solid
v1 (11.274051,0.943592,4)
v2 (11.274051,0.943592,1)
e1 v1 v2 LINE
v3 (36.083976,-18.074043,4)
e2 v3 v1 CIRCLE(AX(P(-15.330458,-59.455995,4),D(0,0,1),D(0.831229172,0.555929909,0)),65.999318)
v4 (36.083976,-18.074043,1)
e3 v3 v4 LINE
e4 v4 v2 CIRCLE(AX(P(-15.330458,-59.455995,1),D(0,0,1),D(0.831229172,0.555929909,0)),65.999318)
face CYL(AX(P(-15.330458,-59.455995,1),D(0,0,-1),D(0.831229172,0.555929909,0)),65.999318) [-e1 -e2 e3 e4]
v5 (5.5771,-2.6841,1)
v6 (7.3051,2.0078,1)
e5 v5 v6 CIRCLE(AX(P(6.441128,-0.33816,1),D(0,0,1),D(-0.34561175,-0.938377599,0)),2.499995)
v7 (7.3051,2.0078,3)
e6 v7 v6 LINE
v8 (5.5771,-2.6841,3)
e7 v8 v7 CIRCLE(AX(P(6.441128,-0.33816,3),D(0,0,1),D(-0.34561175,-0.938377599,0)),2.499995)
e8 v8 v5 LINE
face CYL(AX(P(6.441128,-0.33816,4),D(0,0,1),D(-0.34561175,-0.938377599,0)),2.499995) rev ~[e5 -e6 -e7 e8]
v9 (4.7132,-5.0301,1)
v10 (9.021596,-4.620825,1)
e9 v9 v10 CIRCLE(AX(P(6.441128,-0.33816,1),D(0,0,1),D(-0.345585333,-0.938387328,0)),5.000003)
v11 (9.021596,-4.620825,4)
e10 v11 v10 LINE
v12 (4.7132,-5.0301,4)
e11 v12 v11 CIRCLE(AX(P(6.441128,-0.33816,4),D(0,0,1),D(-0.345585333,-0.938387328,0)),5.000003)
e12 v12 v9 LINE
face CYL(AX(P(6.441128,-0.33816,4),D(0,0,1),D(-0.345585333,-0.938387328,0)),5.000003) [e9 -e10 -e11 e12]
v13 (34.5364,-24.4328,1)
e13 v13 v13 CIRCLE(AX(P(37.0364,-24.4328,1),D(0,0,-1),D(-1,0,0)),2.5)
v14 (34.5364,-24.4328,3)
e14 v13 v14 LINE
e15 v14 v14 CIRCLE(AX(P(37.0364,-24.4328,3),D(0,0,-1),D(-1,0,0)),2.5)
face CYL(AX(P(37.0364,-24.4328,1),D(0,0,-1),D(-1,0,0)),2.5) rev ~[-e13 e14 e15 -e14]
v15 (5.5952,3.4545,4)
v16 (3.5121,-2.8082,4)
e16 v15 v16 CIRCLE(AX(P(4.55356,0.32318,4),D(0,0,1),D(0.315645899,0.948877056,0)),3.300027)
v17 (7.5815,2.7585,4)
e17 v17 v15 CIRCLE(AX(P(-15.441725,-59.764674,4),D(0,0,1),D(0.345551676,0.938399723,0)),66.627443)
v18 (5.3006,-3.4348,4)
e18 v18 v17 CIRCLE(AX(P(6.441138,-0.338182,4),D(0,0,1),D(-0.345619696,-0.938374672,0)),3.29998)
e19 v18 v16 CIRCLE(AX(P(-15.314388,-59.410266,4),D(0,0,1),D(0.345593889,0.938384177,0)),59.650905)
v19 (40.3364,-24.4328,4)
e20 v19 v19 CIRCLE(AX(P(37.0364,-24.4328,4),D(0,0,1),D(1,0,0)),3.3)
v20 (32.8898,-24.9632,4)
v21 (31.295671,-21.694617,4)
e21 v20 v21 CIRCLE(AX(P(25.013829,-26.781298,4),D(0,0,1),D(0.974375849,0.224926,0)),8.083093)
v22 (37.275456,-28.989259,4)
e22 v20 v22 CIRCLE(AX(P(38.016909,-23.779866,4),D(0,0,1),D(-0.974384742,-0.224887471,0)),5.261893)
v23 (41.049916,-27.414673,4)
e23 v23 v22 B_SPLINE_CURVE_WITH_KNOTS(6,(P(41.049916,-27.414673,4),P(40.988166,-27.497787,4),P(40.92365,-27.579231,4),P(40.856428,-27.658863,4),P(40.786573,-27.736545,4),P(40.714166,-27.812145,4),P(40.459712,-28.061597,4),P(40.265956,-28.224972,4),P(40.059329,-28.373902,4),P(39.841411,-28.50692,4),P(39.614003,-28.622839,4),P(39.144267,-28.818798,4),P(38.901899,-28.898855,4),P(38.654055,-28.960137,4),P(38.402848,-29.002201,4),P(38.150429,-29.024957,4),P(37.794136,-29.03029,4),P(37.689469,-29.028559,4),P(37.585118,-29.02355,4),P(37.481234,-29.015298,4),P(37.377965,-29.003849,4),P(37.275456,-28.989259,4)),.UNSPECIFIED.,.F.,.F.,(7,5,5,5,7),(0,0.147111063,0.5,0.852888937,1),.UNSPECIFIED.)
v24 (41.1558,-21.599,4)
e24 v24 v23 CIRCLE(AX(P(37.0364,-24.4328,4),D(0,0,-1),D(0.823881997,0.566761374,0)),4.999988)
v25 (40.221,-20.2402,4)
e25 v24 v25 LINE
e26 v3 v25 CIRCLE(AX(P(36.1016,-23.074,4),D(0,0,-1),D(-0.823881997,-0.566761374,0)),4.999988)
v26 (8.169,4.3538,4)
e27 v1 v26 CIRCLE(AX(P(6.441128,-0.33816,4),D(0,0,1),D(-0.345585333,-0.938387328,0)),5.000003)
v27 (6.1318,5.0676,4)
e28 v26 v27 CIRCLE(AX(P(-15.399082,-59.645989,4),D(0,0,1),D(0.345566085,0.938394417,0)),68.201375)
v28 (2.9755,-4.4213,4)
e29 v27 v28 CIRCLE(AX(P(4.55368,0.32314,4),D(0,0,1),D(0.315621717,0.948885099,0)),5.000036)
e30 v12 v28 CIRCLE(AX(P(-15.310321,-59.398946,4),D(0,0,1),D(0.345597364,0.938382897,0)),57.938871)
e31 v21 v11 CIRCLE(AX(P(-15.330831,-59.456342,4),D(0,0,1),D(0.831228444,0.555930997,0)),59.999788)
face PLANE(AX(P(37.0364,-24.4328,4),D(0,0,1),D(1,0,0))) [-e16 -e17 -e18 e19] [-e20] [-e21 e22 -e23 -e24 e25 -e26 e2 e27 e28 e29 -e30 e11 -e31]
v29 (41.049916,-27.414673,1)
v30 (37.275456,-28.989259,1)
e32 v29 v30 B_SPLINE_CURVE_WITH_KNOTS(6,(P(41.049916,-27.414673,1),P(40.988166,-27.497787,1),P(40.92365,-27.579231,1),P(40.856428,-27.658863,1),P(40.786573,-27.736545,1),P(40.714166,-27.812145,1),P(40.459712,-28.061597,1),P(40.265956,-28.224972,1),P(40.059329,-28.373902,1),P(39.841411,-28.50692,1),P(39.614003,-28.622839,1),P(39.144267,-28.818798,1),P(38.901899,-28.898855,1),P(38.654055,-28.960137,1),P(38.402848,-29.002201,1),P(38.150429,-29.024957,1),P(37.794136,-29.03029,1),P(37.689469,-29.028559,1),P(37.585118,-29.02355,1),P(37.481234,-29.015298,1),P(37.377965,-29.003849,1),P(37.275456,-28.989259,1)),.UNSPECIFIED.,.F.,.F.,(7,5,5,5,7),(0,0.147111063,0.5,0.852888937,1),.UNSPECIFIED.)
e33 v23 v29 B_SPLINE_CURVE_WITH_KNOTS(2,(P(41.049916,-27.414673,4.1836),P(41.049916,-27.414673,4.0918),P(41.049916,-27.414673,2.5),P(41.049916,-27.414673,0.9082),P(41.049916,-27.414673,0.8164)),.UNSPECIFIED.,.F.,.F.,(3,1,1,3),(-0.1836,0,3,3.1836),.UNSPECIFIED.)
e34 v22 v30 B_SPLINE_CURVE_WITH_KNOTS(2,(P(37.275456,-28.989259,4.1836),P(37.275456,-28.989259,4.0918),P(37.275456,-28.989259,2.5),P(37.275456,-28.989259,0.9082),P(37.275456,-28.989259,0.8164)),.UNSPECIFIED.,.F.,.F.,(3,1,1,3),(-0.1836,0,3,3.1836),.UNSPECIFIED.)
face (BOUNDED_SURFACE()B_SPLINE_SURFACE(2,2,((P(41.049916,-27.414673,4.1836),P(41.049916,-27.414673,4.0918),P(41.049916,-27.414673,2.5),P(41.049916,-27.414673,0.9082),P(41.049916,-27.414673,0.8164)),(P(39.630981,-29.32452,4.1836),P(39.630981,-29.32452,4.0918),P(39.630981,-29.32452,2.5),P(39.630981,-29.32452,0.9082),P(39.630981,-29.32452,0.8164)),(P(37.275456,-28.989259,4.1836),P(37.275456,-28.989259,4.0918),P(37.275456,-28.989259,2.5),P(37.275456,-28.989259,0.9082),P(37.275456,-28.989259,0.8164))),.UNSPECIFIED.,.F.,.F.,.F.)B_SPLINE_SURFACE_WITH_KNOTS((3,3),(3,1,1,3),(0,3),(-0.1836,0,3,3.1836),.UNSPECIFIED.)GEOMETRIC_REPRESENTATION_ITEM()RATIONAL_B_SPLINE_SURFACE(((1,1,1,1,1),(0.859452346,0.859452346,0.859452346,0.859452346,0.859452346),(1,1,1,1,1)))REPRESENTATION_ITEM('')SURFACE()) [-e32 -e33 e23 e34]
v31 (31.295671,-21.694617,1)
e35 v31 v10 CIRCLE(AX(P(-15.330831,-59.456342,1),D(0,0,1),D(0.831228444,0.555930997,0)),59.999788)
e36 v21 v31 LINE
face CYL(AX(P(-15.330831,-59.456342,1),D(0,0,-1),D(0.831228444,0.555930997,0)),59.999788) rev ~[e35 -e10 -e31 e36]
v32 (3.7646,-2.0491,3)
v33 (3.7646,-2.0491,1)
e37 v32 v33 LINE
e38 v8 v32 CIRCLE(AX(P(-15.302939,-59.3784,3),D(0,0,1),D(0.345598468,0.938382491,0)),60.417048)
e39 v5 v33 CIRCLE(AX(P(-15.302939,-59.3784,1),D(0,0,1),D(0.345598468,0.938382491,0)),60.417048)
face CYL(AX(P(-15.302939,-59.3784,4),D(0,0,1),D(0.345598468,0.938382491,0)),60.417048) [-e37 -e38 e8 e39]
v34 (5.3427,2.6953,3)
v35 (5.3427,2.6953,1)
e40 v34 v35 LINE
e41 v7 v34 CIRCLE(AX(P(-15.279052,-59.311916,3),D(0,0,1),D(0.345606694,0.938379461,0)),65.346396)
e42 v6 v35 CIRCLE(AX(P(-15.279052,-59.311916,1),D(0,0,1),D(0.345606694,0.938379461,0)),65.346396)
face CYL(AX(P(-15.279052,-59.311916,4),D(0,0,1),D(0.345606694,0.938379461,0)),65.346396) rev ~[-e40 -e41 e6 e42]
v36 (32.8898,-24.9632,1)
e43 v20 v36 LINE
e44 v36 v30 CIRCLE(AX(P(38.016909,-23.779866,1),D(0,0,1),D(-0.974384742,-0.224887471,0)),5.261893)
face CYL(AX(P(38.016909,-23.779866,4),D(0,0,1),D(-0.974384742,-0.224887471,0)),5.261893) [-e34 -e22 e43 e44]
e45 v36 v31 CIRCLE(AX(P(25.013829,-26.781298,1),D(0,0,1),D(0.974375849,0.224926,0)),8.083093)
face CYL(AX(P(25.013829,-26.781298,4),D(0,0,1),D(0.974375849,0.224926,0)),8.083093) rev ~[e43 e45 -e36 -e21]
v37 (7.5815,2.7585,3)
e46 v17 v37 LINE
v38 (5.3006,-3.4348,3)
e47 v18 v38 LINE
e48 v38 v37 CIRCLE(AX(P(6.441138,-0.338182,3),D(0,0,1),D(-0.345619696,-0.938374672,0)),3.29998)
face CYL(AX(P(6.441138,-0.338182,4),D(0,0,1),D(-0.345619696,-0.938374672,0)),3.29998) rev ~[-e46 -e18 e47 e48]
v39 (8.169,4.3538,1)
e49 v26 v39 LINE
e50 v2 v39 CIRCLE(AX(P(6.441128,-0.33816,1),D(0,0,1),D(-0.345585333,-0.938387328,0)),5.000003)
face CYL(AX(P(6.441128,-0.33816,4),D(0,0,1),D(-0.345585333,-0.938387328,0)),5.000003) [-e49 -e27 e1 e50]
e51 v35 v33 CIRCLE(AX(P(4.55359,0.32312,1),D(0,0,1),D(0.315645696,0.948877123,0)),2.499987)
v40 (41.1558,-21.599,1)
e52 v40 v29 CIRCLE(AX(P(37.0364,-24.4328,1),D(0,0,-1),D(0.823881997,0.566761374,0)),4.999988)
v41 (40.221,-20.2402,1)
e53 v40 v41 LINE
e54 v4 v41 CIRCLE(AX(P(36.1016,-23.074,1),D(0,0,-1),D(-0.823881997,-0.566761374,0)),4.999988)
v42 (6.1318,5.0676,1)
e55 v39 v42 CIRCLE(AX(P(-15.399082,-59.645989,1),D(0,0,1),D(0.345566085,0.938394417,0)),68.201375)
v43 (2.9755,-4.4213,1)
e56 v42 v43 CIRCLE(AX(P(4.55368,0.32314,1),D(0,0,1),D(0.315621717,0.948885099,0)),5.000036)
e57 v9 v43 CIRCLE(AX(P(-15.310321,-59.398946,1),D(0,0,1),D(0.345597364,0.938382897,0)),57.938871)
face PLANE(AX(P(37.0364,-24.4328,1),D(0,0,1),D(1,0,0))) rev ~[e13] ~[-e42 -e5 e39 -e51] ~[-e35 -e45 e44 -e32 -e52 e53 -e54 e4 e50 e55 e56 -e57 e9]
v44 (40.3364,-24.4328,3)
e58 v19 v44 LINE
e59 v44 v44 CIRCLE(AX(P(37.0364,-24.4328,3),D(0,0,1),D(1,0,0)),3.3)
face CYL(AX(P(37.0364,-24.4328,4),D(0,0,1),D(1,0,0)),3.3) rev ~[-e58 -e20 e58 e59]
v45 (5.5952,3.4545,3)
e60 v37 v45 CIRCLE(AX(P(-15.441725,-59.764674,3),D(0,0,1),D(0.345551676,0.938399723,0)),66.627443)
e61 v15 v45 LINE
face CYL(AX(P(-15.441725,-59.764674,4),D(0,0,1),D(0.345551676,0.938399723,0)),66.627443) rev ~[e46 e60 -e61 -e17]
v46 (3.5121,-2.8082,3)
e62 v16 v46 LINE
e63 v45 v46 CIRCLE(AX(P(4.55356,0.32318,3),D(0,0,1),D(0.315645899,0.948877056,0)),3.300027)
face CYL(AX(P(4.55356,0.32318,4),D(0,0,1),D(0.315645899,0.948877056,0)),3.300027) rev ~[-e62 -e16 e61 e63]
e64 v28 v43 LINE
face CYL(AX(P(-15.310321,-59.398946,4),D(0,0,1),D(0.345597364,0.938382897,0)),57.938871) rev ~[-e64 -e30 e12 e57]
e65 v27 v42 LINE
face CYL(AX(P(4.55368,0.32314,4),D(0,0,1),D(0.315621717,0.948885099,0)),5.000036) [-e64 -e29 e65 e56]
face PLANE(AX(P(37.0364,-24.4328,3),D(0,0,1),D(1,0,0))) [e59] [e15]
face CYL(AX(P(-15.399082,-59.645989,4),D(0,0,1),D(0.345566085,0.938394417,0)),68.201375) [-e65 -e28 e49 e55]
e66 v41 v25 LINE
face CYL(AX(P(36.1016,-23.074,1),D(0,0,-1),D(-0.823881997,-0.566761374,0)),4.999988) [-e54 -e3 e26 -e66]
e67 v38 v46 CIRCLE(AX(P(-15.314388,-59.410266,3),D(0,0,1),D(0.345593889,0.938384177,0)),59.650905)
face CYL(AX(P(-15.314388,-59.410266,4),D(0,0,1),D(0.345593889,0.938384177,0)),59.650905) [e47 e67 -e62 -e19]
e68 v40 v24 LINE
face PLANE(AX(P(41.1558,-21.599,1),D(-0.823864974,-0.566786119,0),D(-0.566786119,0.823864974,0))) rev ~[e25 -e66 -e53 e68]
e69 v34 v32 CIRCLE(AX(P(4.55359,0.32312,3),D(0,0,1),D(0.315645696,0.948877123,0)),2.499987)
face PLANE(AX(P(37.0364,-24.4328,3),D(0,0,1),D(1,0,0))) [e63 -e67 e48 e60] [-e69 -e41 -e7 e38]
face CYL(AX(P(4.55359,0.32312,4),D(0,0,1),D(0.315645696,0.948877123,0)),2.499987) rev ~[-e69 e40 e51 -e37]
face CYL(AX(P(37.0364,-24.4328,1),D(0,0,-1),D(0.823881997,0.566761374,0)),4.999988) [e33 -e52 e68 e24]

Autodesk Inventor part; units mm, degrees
ref_plane "YZ Plane" through (0, 0, 0) normal (1, 0, 0) x (0, 1, 0)
ref_plane "XZ Plane" through (0, 0, 0) normal (0, 1, 0) x (-1, 0, 0)
ref_plane "Work Plane1" through (37.0364, -24.4328, 1) normal (0, 0, 1) x (1, 0, 0)
sketch "Sketch2" plane through (37.0364, -24.4328, 1) normal (0, 0, 1) x (1, 0, 0)
  circle A0 centre (0, 0) radius 3 construction
  circle A1 centre (0, 0) radius 1.25 projected
  circle A2 centre (-31.5364, 24.4328) radius 3 construction
  circle A3 centre (-31.5364, 24.4328) radius 1.4795 projected
  circle A4 centre (0, 0) radius 1.25 projected
  circle A5 centre (-31.5364, 24.4328) radius 1.4795 projected
  arc A6 (0, 0) -> (-31.5364, 24.4328) centre (-52.3674, -35.0237) ccw construction
  arc A7 (2.4937, 1.6678) -> (-30.5445, 27.264) centre (-52.3674, -35.0237) ccw
  arc A8 (-2.4937, -1.6678) -> (-32.5284, 21.6015) centre (-52.3674, -35.0237) ccw
  arc A9 (-2.4937, -1.6678) -> (2.4937, 1.6678) centre (0, 0) ccw
  arc A10 (-30.5445, 27.264) -> (-32.5284, 21.6015) centre (-31.5364, 24.4328) ccw
  point P0 (-37.0364, 24.4328)
  dimension "d3" = 60
extrude "Extrusion2" add sketch "Sketch2" along normal blind 3
sketch "Sketch4" plane through (5.5, 0, 4) normal (0, 0, 1) x (1, 0, 0)
  arc A0 (29.0427, -26.1006) -> (-0.992, -2.8313) centre (-20.831, -59.4565) ccw construction
  arc A1 (34.0301, -22.765) -> (0.992, 2.8313) centre (-20.831, -59.4565) ccw construction
  circle A2 centre (0, 0) radius 3 construction
  circle A3 centre (0, 0) radius 1.4795 construction
  arc A4 (0.9411, -0.3381) -> (-0.9463, 0.3231) centre (-20.831, -59.4565) ccw construction
  arc A5 (2.669, 4.3538) -> (0.6318, 5.0676) centre (-20.831, -59.4565) ccw
  arc A6 (-0.7868, -5.0301) -> (-2.5245, -4.4213) centre (-20.831, -59.4565) ccw
  arc A7 (-0.7868, -5.0301) -> (2.669, 4.3538) centre (0.9411, -0.3381) ccw
  arc A8 (0.6318, 5.0676) -> (-2.5245, -4.4213) centre (-0.9463, 0.3231) ccw
  arc A9 (0.992, 2.8313) -> (-0.992, -2.8313) centre (0, 0) ccw projected
  arc A10 (29.0427, -26.1006) -> (34.0301, -22.765) centre (31.5364, -24.4328) ccw projected
  dimension "d15" = 10
  dimension "d30" = 1
  dimension "d31" = 1
extrude "Extrusion4" add sketch "Sketch4" against normal blind 3
sketch "Sketch5" plane through (37.0364, -24.4328, 4) normal (0, 0, 1) x (1, 0, 0)
  arc A0 (-30.5953, 24.0947) -> (-32.4828, 24.7559) centre (-52.3674, -35.0237) ccw construction
  arc A1 (-29.7313, 26.4406) -> (-31.6937, 27.1281) centre (-52.3674, -35.0237) ccw
  arc A2 (-31.4593, 21.7487) -> (-33.2718, 22.3837) centre (-52.3674, -35.0237) ccw
  arc A3 (-31.4593, 21.7487) -> (-29.7313, 26.4406) centre (-30.5953, 24.0947) ccw
  arc A4 (-31.6937, 27.1281) -> (-33.2718, 22.3837) centre (-32.4828, 24.7559) ccw
  arc A5 (-30.9046, 29.5004) -> (-34.0609, 20.0115) centre (-32.4828, 24.7559) ccw projected
  arc A6 (-32.3233, 19.4027) -> (-34.0609, 20.0115) centre (-52.3674, -35.0237) ccw projected
  arc A7 (-28.8674, 28.7866) -> (-30.9046, 29.5004) centre (-52.3674, -35.0237) ccw projected
  arc A8 (-25.7624, 25.3765) -> (-28.8674, 28.7866) centre (-30.5953, 24.0947) ccw projected
  arc A9 (-32.3233, 19.4027) -> (-28.0148, 19.812) centre (-30.5953, 24.0947) ccw projected
  arc A10 (-29.4549, 27.1913) -> (-31.4412, 27.8873) centre (-52.3674, -35.0237) ccw
  arc A11 (-31.4412, 27.8873) -> (-33.5243, 21.6246) centre (-32.4828, 24.7559) ccw
  arc A12 (-31.7358, 20.998) -> (-33.5243, 21.6246) centre (-52.3674, -35.0237) ccw
  arc A13 (-31.7358, 20.998) -> (-29.4549, 27.1913) centre (-30.5953, 24.0947) ccw
  dimension "d18" = 5
  dimension "d35" = 0.8
extrude "Extrusion5" cut sketch "Sketch5" against normal blind 5 contours A3 A2 A4 A1
sketch "Sketch6" plane through (37.0364, -24.4328, 1) normal (0, 0, -1) x (-1, 0, 0)
  circle A0 centre (0, 0) radius 1.25 projected
  circle A1 centre (0, 0) radius 2.5
  arc A2 (-4.1194, 2.8338) -> (4.1194, -2.8338) centre (0, 0) ccw
  arc A3 (31.5364, 24.4328) -> (0, 0) centre (52.3674, -35.0237) ccw construction
  arc A4 (5.0542, -1.475) -> (-3.1846, 4.1926) centre (0.9348, 1.3588) ccw
  line L0 (-4.1194, 2.8338) -> (-3.1846, 4.1926)
  line L1 (4.1194, -2.8338) -> (5.0542, -1.475)
  line L2 (-0.7345, 0.4913) -> (0.6872, -0.4596) construction
  line L3 (1.7213, 0.8024) -> (-0.0122, 2.0287) construction
  circle A5 centre (0, 0) radius 3.3
  point P0 (37.0364, 24.4328)
  dimension "d19" = 5
  dimension "d22" = 10
  dimension "d29" = 1.5
  dimension "d32" = 6.6
extrude "Extrusion6" cut sketch "Sketch6" against normal up to surface (3 mm away) contours A1
extrude "Extrusion7" add sketch "Sketch6" against normal up to surface (3 mm away) contours L0 A4 L1 A2 | A5
sketch "Sketch7" plane through (37.0364, -24.4328, 4) normal (0, 0, 1) x (1, 0, 0)
  circle A0 centre (0, 0) radius 3.3 projected
  point P0 (-37.0364, 24.4328)
extrude "Extrusion8" cut sketch "Sketch7" against normal blind 1
extrude "Extrusion9" cut sketch "Sketch5" against normal blind 1
sketch "Sketch8" plane through (37.0364, -24.4328, 4) normal (0, 0, 1) x (1, 0, 0)
  arc A0 (-4.1194, -2.8338) -> (4.1194, 2.8338) centre (0, 0) ccw projected
  arc A1 (-4.1466, -0.5304) -> (2.2951, -4.4421) centre (0.9806, 0.653) ccw
  arc A2 (-5.7407, 2.7382) -> (-28.0148, 19.812) centre (-52.3674, -35.0237) ccw projected
  arc A3 (-4.1466, -0.5304) -> (-5.7407, 2.7382) centre (-12.0206, -2.3478) ccw
  arc A4 (-31.4412, 27.8873) -> (-33.5243, 21.6246) centre (-32.4828, 24.7559) ccw projected
  arc A5 (-29.4549, 27.1913) -> (-31.4412, 27.8873) centre (-52.3674, -35.0237) ccw projected
  arc A6 (-31.7358, 20.998) -> (-29.4549, 27.1913) centre (-30.5953, 24.0947) ccw projected
  arc A7 (-31.7358, 20.998) -> (-33.5243, 21.6246) centre (-52.3674, -35.0237) ccw projected
  circle A8 centre (0, 0) radius 3.3 projected
  arc A9 (-0.9525, 6.3588) -> (-25.7624, 25.3765) centre (-52.3674, -35.0237) ccw projected
  arc A10 (-25.7624, 25.3765) -> (-28.8674, 28.7866) centre (-30.5953, 24.0947) ccw projected
  arc A11 (-28.8674, 28.7866) -> (-30.9046, 29.5004) centre (-52.3674, -35.0237) ccw projected
  arc A12 (-30.9046, 29.5004) -> (-34.0609, 20.0115) centre (-32.4828, 24.7559) ccw projected
  arc A13 (-32.3233, 19.4027) -> (-34.0609, 20.0115) centre (-52.3674, -35.0237) ccw projected
  arc A14 (-32.3233, 19.4027) -> (-28.0148, 19.812) centre (-30.5953, 24.0947) ccw projected
  arc A15 (-5.7407, 2.7382) -> (-28.0148, 19.812) centre (-52.3674, -35.0237) ccw projected
  arc A16 (-5.7407, 2.7382) -> (-5.0542, -1.475) centre (-0.9348, 1.3588) ccw projected
  line L0 (-4.1194, -2.8338) -> (-5.0542, -1.475) projected
  arc A17 (-4.1194, -2.8338) -> (4.1194, 2.8338) centre (0, 0) ccw projected
  line L1 (3.1846, 4.1926) -> (4.1194, 2.8338) projected
  arc A18 (3.1846, 4.1926) -> (-0.9525, 6.3588) centre (-0.9348, 1.3588) ccw projected
  point P0 (-37.0364, 24.4328)
extrude "Extrusion10" cut sketch "Sketch8" against normal up to surface (3 mm away) contours L0 A16 A3 A1 A0
fillet "Fillet1" radius 4 1 edges at (39.3315, -28.8749, 2.5)
